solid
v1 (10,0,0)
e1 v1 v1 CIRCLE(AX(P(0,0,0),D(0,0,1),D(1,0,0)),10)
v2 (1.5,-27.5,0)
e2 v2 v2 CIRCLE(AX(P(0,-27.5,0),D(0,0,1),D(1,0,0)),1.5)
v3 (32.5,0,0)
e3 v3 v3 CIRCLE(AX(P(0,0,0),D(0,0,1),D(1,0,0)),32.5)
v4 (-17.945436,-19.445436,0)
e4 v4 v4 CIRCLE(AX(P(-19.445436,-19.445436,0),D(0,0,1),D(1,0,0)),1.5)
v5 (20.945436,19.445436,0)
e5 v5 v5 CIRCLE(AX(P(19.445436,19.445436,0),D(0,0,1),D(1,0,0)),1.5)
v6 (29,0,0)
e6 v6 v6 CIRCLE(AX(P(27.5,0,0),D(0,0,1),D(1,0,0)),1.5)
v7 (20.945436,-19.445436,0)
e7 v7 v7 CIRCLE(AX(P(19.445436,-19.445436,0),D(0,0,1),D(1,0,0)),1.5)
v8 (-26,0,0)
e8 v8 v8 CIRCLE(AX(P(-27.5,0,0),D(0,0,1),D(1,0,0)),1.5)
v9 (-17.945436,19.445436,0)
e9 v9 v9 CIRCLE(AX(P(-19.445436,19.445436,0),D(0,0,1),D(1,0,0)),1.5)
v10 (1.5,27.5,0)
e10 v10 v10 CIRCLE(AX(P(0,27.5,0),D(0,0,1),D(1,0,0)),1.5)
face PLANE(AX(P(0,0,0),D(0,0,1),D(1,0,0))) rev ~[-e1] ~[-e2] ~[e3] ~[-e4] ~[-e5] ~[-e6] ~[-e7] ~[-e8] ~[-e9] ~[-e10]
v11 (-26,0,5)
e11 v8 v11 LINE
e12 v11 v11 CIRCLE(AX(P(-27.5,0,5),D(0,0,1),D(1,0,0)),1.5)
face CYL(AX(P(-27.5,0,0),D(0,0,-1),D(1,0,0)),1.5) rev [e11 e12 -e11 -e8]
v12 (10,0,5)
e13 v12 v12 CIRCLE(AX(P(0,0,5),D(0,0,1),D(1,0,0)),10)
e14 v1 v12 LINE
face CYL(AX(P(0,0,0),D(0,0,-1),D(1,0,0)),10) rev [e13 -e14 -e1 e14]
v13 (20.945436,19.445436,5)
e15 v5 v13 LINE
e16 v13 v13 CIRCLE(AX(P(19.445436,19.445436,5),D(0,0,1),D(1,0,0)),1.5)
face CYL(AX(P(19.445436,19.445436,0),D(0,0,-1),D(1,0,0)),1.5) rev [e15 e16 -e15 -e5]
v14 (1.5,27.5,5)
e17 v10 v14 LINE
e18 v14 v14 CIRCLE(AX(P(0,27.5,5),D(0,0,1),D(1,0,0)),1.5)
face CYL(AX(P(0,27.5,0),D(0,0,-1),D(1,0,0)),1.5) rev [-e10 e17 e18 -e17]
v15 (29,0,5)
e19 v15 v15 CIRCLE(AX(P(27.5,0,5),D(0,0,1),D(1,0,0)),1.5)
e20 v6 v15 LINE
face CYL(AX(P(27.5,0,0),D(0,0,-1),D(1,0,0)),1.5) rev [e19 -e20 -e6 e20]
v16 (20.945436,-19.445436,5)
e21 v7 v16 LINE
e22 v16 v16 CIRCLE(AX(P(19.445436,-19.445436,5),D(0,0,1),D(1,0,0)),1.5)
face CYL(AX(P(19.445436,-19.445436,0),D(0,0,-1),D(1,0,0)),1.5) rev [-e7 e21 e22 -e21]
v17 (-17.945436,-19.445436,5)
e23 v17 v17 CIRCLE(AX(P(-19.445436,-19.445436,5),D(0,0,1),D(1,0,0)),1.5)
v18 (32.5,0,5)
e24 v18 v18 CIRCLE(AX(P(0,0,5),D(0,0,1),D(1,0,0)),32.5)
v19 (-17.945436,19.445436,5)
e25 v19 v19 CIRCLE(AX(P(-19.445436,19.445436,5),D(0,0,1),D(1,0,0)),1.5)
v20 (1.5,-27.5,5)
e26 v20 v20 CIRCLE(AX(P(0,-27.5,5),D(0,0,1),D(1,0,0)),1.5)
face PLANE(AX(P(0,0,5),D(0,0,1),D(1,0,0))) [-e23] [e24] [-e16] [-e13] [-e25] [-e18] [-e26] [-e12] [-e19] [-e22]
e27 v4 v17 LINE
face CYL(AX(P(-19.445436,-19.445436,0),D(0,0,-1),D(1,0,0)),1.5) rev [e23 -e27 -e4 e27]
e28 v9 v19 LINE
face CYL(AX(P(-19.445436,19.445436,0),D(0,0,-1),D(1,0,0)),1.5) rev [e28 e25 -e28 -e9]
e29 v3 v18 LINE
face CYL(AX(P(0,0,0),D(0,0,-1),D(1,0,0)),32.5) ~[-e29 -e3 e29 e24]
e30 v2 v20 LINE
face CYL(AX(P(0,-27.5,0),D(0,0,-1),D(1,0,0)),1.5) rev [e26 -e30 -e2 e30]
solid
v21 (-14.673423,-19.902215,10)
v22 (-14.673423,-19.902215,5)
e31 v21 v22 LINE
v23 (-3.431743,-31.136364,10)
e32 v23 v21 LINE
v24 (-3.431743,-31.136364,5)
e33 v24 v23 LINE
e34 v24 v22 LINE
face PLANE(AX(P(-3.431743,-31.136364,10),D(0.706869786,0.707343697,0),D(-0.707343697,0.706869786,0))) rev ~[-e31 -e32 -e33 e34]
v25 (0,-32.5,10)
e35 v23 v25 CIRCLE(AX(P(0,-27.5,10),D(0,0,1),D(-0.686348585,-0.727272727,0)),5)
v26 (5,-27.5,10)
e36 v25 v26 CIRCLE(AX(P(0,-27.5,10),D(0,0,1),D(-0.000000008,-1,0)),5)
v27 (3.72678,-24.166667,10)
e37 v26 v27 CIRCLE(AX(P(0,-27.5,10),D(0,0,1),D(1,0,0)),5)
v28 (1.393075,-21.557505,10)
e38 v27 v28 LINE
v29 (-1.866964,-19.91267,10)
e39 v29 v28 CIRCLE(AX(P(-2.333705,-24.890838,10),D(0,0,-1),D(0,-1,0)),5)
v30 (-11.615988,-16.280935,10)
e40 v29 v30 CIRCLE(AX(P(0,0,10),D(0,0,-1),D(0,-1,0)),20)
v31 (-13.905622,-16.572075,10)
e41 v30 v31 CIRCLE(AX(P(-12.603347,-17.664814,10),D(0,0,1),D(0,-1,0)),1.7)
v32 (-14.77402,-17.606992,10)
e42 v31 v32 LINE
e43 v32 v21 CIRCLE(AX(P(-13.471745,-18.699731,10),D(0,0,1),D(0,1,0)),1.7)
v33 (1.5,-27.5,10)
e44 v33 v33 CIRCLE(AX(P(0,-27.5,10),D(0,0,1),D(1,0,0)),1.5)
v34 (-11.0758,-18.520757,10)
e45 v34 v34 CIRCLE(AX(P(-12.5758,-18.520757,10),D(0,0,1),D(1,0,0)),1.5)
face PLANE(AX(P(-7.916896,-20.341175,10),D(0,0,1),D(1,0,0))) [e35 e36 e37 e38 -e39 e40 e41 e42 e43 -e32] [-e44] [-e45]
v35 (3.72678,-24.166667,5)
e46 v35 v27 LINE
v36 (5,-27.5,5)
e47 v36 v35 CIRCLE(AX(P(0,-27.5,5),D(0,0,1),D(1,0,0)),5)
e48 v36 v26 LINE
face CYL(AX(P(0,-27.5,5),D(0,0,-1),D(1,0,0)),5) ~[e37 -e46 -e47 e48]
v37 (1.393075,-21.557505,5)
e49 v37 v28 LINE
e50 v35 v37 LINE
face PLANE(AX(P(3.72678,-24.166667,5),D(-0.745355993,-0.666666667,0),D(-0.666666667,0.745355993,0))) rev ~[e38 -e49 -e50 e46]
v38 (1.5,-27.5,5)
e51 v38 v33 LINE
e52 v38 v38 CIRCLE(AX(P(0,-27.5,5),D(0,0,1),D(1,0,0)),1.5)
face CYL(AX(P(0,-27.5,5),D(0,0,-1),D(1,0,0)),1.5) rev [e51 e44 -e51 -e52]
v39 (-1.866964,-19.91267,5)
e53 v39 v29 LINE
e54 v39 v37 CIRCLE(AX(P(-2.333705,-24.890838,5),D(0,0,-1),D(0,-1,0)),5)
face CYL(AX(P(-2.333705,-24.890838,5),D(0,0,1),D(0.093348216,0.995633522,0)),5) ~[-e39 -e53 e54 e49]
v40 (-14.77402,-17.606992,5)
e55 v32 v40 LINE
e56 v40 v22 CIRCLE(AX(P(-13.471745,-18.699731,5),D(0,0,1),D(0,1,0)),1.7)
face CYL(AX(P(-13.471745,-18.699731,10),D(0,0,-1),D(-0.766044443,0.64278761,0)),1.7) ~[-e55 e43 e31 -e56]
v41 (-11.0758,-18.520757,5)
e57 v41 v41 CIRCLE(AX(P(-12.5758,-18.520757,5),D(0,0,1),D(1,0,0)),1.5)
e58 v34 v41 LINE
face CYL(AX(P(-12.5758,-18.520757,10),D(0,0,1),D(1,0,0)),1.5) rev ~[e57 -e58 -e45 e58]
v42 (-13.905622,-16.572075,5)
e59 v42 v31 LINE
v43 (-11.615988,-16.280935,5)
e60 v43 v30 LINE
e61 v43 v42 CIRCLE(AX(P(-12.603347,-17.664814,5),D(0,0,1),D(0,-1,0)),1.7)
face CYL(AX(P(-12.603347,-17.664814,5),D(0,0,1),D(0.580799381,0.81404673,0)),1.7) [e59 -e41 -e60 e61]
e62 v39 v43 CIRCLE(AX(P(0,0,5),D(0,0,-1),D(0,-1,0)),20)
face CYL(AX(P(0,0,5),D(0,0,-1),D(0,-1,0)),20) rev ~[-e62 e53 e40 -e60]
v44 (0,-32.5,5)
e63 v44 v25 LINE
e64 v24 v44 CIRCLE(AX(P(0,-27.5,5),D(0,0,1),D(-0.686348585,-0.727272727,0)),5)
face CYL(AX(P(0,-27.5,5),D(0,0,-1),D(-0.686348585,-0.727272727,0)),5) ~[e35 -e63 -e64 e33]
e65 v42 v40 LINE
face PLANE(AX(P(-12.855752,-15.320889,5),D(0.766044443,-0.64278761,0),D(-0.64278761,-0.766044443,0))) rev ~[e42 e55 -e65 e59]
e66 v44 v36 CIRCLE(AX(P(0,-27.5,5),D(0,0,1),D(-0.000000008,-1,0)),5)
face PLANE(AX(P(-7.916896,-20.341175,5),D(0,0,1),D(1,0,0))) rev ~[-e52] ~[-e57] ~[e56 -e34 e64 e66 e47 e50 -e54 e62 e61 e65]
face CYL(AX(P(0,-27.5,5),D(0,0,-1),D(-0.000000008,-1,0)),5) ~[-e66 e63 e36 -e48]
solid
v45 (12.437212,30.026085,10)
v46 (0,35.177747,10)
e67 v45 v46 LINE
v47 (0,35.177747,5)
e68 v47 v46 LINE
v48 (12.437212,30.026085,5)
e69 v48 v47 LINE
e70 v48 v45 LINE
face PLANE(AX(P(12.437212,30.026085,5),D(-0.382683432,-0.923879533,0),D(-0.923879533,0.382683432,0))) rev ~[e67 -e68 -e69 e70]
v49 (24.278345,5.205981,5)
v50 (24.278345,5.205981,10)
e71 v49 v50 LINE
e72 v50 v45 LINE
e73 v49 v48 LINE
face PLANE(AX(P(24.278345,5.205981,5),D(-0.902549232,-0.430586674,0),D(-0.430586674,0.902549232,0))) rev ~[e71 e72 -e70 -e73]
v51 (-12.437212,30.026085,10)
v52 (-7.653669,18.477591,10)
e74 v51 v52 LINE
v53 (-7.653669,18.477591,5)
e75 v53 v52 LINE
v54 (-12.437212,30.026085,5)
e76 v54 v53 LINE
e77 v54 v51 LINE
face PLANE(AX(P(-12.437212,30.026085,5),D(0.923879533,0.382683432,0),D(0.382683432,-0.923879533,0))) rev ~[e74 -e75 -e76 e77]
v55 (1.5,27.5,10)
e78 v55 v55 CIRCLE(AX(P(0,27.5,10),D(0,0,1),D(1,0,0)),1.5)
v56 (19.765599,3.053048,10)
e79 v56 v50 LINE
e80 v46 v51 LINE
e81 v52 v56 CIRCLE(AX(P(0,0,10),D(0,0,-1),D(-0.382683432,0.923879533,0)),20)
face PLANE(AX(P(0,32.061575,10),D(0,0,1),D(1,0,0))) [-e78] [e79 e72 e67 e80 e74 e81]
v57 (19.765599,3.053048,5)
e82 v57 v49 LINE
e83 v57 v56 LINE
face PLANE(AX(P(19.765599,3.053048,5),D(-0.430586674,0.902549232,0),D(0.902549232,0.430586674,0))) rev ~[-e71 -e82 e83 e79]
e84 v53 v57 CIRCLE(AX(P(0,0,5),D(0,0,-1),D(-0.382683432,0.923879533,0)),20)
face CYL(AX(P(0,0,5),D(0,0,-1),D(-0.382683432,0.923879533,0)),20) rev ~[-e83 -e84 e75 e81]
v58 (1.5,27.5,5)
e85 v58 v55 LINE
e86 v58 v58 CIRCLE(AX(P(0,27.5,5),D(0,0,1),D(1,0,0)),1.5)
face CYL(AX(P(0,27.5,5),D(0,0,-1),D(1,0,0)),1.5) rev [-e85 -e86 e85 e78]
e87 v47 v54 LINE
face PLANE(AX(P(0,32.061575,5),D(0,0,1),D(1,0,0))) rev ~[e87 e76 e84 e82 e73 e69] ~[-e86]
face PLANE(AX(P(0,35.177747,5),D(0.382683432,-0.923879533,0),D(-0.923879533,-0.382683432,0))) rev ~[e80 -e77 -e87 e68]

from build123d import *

# Parameters (mm, degrees)
F0_R     = 32.5
F0_R_2   = 1.5
F0_R_3   = 10
F1_DEPTH = 5
F2_R     = 1.5
F3_DEPTH = 5
F4_R     = 1.5
F5_DEPTH = 5
F6_R     = 1.7
F7_R     = 5


# Not quite as in the source:
# - a feature names something its author has since deleted; it is built from what else it names


with BuildPart() as f1:
    # F0 (on Top) → F1 (new body)
    with BuildSketch(Plane.XY):
        Circle(F0_R)
        with Locations((-19.4454364826, -19.4454364826)):
            Circle(F0_R_2, mode=Mode.SUBTRACT)
        with Locations((0, -27.5)):
            Circle(F0_R_2, mode=Mode.SUBTRACT)
        with Locations((19.4454364826, -19.4454364826)):
            Circle(F0_R_2, mode=Mode.SUBTRACT)
        with Locations((-27.5, 0)):
            Circle(F0_R_2, mode=Mode.SUBTRACT)
        with Locations((-19.4454364826, 19.4454364826)):
            Circle(F0_R_2, mode=Mode.SUBTRACT)
        Circle(F0_R_3, mode=Mode.SUBTRACT)
        with Locations((27.5, 0)):
            Circle(F0_R_2, mode=Mode.SUBTRACT)
        with Locations((0, 27.5)):
            Circle(F0_R_2, mode=Mode.SUBTRACT)
        with Locations((19.4454364826, 19.4454364826)):
            Circle(F0_R_2, mode=Mode.SUBTRACT)
    extrude(amount=F1_DEPTH)


with BuildPart() as f3:
    # F2 (on face) → F3 (new body)
    with BuildSketch(Plane.XY.offset(5)):
        with BuildLine():
            Line((12.4372115519, 30.0260848066), (0, 35.1777465095))
            Line((0, 35.1777465095), (-12.4372115519, 30.0260848066))
            ThreePointArc((-12.4372115519, 30.0260848066), (0, 32.5), (12.4372115519, 30.0260848066))
        make_face()
        with BuildLine():
            Line((24.2783450797, 5.2059809233), (12.4372115519, 30.0260848066))
            ThreePointArc((12.4372115519, 30.0260848066), (0, 32.5), (-12.4372115519, 30.0260848066))
            Line((-12.4372115519, 30.0260848066), (-7.6536686473, 18.4775906502))
            ThreePointArc((-7.6536686473, 18.4775906502), (9.8058067569, 17.4311833748), (19.7655989191, 3.0530475546))
            Line((19.7655989191, 3.0530475546), (24.2783450797, 5.2059809233))
        make_face()
        with Locations((0, 27.5)):
            Circle(F2_R, mode=Mode.SUBTRACT)
    extrude(amount=F3_DEPTH)


with BuildPart() as f3b:
    # F2 (on face) → F3, piece 2 (new body)
    with BuildSketch(Plane.XY.offset(5)):
        with BuildLine():
            ThreePointArc((0, -20), (-6.8404028665, -18.7938524157), (-12.8557521937, -15.3208888624))
            Line((-12.8557521937, -15.3208888624), (-16.0696902422, -19.151111078))
            ThreePointArc((-16.0696902422, -19.151111078), (-10.4611183934, -22.7060565039), (-4.1145152251, -24.6590909091))
            ThreePointArc((-4.1145152251, -24.6590909091), (-2.3233009432, -23.0725546048), (0, -22.5))
            Line((0, -22.5), (0, -20))
        make_face()
        with BuildLine():
            Line((3.7267799625, -24.1666666667), (0, -20))
            Line((0, -20), (0, -22.5))
            ThreePointArc((0, -22.5), (2.0412414523, -22.9356453541), (3.7267799625, -24.1666666667))
        make_face()
        with BuildLine():
            ThreePointArc((-4.1145152251, -24.6590909091), (-10.4611183934, -22.7060565039), (-16.0696902422, -19.151111078))
            Line((-16.0696902422, -19.151111078), (-16.0970617223, -19.1837311378))
            Line((-16.0970617223, -19.1837311378), (-3.4317429251, -31.1363636364))
            ThreePointArc((-3.4317429251, -31.1363636364), (-4.9724509563, -28.0241483443), (-4.1145152251, -24.6590909091))
        make_face()
        with BuildLine():
            ThreePointArc((3.7267799625, -24.1666666667), (2.0412414523, -22.9356453541), (0, -22.5))
            ThreePointArc((0, -22.5), (-2.3233009432, -23.0725546048), (-4.1145152251, -24.6590909091))
            ThreePointArc((-4.1145152251, -24.6590909091), (-4.9724509563, -28.0241483443), (-3.4317429251, -31.1363636364))
            ThreePointArc((-3.4317429251, -31.1363636364), (-1.8463723838, -32.1466018788), (-4.12e-08, -32.5))
            ThreePointArc((-4.12e-08, -32.5), (3.5355338914, -31.0355339205), (5, -27.5))
            ThreePointArc((5, -27.5), (4.6708617948, -25.7158895511), (3.7267799625, -24.1666666667))
        make_face()
        with Locations((0, -27.5)):
            Circle(F2_R, mode=Mode.SUBTRACT)
    extrude(amount=F3_DEPTH)

    # F4 (on face) → F5 (cut, through all)
    with BuildSketch(Plane.XY.offset(10)):
        Polygon((-3.4317429251, -31.1363636364), (-15.7756679175, -18.8007089162), (-16.0970617223, -19.1837311378), align=None)
        with Locations((-12.5758000287, -18.5207567512)):
            Circle(F4_R)
    extrude(amount=-F5_DEPTH, mode=Mode.SUBTRACT)

    # F6
    f6_edges = [f3b.edges().sort_by_distance(p)[0] for p in [
        (-15.775668, -18.800709, 7.5),
        (-12.855752, -15.320889, 7.5),
    ]]
    fillet(f6_edges, radius=F6_R)

    # F7
    f7_edges = [f3b.edges().sort_by_distance(p)[0] for p in [
        (0, -20, 7.5),
    ]]
    fillet(f7_edges, radius=F7_R)


solid = Compound([f1.part, f3.part, f3b.part])
